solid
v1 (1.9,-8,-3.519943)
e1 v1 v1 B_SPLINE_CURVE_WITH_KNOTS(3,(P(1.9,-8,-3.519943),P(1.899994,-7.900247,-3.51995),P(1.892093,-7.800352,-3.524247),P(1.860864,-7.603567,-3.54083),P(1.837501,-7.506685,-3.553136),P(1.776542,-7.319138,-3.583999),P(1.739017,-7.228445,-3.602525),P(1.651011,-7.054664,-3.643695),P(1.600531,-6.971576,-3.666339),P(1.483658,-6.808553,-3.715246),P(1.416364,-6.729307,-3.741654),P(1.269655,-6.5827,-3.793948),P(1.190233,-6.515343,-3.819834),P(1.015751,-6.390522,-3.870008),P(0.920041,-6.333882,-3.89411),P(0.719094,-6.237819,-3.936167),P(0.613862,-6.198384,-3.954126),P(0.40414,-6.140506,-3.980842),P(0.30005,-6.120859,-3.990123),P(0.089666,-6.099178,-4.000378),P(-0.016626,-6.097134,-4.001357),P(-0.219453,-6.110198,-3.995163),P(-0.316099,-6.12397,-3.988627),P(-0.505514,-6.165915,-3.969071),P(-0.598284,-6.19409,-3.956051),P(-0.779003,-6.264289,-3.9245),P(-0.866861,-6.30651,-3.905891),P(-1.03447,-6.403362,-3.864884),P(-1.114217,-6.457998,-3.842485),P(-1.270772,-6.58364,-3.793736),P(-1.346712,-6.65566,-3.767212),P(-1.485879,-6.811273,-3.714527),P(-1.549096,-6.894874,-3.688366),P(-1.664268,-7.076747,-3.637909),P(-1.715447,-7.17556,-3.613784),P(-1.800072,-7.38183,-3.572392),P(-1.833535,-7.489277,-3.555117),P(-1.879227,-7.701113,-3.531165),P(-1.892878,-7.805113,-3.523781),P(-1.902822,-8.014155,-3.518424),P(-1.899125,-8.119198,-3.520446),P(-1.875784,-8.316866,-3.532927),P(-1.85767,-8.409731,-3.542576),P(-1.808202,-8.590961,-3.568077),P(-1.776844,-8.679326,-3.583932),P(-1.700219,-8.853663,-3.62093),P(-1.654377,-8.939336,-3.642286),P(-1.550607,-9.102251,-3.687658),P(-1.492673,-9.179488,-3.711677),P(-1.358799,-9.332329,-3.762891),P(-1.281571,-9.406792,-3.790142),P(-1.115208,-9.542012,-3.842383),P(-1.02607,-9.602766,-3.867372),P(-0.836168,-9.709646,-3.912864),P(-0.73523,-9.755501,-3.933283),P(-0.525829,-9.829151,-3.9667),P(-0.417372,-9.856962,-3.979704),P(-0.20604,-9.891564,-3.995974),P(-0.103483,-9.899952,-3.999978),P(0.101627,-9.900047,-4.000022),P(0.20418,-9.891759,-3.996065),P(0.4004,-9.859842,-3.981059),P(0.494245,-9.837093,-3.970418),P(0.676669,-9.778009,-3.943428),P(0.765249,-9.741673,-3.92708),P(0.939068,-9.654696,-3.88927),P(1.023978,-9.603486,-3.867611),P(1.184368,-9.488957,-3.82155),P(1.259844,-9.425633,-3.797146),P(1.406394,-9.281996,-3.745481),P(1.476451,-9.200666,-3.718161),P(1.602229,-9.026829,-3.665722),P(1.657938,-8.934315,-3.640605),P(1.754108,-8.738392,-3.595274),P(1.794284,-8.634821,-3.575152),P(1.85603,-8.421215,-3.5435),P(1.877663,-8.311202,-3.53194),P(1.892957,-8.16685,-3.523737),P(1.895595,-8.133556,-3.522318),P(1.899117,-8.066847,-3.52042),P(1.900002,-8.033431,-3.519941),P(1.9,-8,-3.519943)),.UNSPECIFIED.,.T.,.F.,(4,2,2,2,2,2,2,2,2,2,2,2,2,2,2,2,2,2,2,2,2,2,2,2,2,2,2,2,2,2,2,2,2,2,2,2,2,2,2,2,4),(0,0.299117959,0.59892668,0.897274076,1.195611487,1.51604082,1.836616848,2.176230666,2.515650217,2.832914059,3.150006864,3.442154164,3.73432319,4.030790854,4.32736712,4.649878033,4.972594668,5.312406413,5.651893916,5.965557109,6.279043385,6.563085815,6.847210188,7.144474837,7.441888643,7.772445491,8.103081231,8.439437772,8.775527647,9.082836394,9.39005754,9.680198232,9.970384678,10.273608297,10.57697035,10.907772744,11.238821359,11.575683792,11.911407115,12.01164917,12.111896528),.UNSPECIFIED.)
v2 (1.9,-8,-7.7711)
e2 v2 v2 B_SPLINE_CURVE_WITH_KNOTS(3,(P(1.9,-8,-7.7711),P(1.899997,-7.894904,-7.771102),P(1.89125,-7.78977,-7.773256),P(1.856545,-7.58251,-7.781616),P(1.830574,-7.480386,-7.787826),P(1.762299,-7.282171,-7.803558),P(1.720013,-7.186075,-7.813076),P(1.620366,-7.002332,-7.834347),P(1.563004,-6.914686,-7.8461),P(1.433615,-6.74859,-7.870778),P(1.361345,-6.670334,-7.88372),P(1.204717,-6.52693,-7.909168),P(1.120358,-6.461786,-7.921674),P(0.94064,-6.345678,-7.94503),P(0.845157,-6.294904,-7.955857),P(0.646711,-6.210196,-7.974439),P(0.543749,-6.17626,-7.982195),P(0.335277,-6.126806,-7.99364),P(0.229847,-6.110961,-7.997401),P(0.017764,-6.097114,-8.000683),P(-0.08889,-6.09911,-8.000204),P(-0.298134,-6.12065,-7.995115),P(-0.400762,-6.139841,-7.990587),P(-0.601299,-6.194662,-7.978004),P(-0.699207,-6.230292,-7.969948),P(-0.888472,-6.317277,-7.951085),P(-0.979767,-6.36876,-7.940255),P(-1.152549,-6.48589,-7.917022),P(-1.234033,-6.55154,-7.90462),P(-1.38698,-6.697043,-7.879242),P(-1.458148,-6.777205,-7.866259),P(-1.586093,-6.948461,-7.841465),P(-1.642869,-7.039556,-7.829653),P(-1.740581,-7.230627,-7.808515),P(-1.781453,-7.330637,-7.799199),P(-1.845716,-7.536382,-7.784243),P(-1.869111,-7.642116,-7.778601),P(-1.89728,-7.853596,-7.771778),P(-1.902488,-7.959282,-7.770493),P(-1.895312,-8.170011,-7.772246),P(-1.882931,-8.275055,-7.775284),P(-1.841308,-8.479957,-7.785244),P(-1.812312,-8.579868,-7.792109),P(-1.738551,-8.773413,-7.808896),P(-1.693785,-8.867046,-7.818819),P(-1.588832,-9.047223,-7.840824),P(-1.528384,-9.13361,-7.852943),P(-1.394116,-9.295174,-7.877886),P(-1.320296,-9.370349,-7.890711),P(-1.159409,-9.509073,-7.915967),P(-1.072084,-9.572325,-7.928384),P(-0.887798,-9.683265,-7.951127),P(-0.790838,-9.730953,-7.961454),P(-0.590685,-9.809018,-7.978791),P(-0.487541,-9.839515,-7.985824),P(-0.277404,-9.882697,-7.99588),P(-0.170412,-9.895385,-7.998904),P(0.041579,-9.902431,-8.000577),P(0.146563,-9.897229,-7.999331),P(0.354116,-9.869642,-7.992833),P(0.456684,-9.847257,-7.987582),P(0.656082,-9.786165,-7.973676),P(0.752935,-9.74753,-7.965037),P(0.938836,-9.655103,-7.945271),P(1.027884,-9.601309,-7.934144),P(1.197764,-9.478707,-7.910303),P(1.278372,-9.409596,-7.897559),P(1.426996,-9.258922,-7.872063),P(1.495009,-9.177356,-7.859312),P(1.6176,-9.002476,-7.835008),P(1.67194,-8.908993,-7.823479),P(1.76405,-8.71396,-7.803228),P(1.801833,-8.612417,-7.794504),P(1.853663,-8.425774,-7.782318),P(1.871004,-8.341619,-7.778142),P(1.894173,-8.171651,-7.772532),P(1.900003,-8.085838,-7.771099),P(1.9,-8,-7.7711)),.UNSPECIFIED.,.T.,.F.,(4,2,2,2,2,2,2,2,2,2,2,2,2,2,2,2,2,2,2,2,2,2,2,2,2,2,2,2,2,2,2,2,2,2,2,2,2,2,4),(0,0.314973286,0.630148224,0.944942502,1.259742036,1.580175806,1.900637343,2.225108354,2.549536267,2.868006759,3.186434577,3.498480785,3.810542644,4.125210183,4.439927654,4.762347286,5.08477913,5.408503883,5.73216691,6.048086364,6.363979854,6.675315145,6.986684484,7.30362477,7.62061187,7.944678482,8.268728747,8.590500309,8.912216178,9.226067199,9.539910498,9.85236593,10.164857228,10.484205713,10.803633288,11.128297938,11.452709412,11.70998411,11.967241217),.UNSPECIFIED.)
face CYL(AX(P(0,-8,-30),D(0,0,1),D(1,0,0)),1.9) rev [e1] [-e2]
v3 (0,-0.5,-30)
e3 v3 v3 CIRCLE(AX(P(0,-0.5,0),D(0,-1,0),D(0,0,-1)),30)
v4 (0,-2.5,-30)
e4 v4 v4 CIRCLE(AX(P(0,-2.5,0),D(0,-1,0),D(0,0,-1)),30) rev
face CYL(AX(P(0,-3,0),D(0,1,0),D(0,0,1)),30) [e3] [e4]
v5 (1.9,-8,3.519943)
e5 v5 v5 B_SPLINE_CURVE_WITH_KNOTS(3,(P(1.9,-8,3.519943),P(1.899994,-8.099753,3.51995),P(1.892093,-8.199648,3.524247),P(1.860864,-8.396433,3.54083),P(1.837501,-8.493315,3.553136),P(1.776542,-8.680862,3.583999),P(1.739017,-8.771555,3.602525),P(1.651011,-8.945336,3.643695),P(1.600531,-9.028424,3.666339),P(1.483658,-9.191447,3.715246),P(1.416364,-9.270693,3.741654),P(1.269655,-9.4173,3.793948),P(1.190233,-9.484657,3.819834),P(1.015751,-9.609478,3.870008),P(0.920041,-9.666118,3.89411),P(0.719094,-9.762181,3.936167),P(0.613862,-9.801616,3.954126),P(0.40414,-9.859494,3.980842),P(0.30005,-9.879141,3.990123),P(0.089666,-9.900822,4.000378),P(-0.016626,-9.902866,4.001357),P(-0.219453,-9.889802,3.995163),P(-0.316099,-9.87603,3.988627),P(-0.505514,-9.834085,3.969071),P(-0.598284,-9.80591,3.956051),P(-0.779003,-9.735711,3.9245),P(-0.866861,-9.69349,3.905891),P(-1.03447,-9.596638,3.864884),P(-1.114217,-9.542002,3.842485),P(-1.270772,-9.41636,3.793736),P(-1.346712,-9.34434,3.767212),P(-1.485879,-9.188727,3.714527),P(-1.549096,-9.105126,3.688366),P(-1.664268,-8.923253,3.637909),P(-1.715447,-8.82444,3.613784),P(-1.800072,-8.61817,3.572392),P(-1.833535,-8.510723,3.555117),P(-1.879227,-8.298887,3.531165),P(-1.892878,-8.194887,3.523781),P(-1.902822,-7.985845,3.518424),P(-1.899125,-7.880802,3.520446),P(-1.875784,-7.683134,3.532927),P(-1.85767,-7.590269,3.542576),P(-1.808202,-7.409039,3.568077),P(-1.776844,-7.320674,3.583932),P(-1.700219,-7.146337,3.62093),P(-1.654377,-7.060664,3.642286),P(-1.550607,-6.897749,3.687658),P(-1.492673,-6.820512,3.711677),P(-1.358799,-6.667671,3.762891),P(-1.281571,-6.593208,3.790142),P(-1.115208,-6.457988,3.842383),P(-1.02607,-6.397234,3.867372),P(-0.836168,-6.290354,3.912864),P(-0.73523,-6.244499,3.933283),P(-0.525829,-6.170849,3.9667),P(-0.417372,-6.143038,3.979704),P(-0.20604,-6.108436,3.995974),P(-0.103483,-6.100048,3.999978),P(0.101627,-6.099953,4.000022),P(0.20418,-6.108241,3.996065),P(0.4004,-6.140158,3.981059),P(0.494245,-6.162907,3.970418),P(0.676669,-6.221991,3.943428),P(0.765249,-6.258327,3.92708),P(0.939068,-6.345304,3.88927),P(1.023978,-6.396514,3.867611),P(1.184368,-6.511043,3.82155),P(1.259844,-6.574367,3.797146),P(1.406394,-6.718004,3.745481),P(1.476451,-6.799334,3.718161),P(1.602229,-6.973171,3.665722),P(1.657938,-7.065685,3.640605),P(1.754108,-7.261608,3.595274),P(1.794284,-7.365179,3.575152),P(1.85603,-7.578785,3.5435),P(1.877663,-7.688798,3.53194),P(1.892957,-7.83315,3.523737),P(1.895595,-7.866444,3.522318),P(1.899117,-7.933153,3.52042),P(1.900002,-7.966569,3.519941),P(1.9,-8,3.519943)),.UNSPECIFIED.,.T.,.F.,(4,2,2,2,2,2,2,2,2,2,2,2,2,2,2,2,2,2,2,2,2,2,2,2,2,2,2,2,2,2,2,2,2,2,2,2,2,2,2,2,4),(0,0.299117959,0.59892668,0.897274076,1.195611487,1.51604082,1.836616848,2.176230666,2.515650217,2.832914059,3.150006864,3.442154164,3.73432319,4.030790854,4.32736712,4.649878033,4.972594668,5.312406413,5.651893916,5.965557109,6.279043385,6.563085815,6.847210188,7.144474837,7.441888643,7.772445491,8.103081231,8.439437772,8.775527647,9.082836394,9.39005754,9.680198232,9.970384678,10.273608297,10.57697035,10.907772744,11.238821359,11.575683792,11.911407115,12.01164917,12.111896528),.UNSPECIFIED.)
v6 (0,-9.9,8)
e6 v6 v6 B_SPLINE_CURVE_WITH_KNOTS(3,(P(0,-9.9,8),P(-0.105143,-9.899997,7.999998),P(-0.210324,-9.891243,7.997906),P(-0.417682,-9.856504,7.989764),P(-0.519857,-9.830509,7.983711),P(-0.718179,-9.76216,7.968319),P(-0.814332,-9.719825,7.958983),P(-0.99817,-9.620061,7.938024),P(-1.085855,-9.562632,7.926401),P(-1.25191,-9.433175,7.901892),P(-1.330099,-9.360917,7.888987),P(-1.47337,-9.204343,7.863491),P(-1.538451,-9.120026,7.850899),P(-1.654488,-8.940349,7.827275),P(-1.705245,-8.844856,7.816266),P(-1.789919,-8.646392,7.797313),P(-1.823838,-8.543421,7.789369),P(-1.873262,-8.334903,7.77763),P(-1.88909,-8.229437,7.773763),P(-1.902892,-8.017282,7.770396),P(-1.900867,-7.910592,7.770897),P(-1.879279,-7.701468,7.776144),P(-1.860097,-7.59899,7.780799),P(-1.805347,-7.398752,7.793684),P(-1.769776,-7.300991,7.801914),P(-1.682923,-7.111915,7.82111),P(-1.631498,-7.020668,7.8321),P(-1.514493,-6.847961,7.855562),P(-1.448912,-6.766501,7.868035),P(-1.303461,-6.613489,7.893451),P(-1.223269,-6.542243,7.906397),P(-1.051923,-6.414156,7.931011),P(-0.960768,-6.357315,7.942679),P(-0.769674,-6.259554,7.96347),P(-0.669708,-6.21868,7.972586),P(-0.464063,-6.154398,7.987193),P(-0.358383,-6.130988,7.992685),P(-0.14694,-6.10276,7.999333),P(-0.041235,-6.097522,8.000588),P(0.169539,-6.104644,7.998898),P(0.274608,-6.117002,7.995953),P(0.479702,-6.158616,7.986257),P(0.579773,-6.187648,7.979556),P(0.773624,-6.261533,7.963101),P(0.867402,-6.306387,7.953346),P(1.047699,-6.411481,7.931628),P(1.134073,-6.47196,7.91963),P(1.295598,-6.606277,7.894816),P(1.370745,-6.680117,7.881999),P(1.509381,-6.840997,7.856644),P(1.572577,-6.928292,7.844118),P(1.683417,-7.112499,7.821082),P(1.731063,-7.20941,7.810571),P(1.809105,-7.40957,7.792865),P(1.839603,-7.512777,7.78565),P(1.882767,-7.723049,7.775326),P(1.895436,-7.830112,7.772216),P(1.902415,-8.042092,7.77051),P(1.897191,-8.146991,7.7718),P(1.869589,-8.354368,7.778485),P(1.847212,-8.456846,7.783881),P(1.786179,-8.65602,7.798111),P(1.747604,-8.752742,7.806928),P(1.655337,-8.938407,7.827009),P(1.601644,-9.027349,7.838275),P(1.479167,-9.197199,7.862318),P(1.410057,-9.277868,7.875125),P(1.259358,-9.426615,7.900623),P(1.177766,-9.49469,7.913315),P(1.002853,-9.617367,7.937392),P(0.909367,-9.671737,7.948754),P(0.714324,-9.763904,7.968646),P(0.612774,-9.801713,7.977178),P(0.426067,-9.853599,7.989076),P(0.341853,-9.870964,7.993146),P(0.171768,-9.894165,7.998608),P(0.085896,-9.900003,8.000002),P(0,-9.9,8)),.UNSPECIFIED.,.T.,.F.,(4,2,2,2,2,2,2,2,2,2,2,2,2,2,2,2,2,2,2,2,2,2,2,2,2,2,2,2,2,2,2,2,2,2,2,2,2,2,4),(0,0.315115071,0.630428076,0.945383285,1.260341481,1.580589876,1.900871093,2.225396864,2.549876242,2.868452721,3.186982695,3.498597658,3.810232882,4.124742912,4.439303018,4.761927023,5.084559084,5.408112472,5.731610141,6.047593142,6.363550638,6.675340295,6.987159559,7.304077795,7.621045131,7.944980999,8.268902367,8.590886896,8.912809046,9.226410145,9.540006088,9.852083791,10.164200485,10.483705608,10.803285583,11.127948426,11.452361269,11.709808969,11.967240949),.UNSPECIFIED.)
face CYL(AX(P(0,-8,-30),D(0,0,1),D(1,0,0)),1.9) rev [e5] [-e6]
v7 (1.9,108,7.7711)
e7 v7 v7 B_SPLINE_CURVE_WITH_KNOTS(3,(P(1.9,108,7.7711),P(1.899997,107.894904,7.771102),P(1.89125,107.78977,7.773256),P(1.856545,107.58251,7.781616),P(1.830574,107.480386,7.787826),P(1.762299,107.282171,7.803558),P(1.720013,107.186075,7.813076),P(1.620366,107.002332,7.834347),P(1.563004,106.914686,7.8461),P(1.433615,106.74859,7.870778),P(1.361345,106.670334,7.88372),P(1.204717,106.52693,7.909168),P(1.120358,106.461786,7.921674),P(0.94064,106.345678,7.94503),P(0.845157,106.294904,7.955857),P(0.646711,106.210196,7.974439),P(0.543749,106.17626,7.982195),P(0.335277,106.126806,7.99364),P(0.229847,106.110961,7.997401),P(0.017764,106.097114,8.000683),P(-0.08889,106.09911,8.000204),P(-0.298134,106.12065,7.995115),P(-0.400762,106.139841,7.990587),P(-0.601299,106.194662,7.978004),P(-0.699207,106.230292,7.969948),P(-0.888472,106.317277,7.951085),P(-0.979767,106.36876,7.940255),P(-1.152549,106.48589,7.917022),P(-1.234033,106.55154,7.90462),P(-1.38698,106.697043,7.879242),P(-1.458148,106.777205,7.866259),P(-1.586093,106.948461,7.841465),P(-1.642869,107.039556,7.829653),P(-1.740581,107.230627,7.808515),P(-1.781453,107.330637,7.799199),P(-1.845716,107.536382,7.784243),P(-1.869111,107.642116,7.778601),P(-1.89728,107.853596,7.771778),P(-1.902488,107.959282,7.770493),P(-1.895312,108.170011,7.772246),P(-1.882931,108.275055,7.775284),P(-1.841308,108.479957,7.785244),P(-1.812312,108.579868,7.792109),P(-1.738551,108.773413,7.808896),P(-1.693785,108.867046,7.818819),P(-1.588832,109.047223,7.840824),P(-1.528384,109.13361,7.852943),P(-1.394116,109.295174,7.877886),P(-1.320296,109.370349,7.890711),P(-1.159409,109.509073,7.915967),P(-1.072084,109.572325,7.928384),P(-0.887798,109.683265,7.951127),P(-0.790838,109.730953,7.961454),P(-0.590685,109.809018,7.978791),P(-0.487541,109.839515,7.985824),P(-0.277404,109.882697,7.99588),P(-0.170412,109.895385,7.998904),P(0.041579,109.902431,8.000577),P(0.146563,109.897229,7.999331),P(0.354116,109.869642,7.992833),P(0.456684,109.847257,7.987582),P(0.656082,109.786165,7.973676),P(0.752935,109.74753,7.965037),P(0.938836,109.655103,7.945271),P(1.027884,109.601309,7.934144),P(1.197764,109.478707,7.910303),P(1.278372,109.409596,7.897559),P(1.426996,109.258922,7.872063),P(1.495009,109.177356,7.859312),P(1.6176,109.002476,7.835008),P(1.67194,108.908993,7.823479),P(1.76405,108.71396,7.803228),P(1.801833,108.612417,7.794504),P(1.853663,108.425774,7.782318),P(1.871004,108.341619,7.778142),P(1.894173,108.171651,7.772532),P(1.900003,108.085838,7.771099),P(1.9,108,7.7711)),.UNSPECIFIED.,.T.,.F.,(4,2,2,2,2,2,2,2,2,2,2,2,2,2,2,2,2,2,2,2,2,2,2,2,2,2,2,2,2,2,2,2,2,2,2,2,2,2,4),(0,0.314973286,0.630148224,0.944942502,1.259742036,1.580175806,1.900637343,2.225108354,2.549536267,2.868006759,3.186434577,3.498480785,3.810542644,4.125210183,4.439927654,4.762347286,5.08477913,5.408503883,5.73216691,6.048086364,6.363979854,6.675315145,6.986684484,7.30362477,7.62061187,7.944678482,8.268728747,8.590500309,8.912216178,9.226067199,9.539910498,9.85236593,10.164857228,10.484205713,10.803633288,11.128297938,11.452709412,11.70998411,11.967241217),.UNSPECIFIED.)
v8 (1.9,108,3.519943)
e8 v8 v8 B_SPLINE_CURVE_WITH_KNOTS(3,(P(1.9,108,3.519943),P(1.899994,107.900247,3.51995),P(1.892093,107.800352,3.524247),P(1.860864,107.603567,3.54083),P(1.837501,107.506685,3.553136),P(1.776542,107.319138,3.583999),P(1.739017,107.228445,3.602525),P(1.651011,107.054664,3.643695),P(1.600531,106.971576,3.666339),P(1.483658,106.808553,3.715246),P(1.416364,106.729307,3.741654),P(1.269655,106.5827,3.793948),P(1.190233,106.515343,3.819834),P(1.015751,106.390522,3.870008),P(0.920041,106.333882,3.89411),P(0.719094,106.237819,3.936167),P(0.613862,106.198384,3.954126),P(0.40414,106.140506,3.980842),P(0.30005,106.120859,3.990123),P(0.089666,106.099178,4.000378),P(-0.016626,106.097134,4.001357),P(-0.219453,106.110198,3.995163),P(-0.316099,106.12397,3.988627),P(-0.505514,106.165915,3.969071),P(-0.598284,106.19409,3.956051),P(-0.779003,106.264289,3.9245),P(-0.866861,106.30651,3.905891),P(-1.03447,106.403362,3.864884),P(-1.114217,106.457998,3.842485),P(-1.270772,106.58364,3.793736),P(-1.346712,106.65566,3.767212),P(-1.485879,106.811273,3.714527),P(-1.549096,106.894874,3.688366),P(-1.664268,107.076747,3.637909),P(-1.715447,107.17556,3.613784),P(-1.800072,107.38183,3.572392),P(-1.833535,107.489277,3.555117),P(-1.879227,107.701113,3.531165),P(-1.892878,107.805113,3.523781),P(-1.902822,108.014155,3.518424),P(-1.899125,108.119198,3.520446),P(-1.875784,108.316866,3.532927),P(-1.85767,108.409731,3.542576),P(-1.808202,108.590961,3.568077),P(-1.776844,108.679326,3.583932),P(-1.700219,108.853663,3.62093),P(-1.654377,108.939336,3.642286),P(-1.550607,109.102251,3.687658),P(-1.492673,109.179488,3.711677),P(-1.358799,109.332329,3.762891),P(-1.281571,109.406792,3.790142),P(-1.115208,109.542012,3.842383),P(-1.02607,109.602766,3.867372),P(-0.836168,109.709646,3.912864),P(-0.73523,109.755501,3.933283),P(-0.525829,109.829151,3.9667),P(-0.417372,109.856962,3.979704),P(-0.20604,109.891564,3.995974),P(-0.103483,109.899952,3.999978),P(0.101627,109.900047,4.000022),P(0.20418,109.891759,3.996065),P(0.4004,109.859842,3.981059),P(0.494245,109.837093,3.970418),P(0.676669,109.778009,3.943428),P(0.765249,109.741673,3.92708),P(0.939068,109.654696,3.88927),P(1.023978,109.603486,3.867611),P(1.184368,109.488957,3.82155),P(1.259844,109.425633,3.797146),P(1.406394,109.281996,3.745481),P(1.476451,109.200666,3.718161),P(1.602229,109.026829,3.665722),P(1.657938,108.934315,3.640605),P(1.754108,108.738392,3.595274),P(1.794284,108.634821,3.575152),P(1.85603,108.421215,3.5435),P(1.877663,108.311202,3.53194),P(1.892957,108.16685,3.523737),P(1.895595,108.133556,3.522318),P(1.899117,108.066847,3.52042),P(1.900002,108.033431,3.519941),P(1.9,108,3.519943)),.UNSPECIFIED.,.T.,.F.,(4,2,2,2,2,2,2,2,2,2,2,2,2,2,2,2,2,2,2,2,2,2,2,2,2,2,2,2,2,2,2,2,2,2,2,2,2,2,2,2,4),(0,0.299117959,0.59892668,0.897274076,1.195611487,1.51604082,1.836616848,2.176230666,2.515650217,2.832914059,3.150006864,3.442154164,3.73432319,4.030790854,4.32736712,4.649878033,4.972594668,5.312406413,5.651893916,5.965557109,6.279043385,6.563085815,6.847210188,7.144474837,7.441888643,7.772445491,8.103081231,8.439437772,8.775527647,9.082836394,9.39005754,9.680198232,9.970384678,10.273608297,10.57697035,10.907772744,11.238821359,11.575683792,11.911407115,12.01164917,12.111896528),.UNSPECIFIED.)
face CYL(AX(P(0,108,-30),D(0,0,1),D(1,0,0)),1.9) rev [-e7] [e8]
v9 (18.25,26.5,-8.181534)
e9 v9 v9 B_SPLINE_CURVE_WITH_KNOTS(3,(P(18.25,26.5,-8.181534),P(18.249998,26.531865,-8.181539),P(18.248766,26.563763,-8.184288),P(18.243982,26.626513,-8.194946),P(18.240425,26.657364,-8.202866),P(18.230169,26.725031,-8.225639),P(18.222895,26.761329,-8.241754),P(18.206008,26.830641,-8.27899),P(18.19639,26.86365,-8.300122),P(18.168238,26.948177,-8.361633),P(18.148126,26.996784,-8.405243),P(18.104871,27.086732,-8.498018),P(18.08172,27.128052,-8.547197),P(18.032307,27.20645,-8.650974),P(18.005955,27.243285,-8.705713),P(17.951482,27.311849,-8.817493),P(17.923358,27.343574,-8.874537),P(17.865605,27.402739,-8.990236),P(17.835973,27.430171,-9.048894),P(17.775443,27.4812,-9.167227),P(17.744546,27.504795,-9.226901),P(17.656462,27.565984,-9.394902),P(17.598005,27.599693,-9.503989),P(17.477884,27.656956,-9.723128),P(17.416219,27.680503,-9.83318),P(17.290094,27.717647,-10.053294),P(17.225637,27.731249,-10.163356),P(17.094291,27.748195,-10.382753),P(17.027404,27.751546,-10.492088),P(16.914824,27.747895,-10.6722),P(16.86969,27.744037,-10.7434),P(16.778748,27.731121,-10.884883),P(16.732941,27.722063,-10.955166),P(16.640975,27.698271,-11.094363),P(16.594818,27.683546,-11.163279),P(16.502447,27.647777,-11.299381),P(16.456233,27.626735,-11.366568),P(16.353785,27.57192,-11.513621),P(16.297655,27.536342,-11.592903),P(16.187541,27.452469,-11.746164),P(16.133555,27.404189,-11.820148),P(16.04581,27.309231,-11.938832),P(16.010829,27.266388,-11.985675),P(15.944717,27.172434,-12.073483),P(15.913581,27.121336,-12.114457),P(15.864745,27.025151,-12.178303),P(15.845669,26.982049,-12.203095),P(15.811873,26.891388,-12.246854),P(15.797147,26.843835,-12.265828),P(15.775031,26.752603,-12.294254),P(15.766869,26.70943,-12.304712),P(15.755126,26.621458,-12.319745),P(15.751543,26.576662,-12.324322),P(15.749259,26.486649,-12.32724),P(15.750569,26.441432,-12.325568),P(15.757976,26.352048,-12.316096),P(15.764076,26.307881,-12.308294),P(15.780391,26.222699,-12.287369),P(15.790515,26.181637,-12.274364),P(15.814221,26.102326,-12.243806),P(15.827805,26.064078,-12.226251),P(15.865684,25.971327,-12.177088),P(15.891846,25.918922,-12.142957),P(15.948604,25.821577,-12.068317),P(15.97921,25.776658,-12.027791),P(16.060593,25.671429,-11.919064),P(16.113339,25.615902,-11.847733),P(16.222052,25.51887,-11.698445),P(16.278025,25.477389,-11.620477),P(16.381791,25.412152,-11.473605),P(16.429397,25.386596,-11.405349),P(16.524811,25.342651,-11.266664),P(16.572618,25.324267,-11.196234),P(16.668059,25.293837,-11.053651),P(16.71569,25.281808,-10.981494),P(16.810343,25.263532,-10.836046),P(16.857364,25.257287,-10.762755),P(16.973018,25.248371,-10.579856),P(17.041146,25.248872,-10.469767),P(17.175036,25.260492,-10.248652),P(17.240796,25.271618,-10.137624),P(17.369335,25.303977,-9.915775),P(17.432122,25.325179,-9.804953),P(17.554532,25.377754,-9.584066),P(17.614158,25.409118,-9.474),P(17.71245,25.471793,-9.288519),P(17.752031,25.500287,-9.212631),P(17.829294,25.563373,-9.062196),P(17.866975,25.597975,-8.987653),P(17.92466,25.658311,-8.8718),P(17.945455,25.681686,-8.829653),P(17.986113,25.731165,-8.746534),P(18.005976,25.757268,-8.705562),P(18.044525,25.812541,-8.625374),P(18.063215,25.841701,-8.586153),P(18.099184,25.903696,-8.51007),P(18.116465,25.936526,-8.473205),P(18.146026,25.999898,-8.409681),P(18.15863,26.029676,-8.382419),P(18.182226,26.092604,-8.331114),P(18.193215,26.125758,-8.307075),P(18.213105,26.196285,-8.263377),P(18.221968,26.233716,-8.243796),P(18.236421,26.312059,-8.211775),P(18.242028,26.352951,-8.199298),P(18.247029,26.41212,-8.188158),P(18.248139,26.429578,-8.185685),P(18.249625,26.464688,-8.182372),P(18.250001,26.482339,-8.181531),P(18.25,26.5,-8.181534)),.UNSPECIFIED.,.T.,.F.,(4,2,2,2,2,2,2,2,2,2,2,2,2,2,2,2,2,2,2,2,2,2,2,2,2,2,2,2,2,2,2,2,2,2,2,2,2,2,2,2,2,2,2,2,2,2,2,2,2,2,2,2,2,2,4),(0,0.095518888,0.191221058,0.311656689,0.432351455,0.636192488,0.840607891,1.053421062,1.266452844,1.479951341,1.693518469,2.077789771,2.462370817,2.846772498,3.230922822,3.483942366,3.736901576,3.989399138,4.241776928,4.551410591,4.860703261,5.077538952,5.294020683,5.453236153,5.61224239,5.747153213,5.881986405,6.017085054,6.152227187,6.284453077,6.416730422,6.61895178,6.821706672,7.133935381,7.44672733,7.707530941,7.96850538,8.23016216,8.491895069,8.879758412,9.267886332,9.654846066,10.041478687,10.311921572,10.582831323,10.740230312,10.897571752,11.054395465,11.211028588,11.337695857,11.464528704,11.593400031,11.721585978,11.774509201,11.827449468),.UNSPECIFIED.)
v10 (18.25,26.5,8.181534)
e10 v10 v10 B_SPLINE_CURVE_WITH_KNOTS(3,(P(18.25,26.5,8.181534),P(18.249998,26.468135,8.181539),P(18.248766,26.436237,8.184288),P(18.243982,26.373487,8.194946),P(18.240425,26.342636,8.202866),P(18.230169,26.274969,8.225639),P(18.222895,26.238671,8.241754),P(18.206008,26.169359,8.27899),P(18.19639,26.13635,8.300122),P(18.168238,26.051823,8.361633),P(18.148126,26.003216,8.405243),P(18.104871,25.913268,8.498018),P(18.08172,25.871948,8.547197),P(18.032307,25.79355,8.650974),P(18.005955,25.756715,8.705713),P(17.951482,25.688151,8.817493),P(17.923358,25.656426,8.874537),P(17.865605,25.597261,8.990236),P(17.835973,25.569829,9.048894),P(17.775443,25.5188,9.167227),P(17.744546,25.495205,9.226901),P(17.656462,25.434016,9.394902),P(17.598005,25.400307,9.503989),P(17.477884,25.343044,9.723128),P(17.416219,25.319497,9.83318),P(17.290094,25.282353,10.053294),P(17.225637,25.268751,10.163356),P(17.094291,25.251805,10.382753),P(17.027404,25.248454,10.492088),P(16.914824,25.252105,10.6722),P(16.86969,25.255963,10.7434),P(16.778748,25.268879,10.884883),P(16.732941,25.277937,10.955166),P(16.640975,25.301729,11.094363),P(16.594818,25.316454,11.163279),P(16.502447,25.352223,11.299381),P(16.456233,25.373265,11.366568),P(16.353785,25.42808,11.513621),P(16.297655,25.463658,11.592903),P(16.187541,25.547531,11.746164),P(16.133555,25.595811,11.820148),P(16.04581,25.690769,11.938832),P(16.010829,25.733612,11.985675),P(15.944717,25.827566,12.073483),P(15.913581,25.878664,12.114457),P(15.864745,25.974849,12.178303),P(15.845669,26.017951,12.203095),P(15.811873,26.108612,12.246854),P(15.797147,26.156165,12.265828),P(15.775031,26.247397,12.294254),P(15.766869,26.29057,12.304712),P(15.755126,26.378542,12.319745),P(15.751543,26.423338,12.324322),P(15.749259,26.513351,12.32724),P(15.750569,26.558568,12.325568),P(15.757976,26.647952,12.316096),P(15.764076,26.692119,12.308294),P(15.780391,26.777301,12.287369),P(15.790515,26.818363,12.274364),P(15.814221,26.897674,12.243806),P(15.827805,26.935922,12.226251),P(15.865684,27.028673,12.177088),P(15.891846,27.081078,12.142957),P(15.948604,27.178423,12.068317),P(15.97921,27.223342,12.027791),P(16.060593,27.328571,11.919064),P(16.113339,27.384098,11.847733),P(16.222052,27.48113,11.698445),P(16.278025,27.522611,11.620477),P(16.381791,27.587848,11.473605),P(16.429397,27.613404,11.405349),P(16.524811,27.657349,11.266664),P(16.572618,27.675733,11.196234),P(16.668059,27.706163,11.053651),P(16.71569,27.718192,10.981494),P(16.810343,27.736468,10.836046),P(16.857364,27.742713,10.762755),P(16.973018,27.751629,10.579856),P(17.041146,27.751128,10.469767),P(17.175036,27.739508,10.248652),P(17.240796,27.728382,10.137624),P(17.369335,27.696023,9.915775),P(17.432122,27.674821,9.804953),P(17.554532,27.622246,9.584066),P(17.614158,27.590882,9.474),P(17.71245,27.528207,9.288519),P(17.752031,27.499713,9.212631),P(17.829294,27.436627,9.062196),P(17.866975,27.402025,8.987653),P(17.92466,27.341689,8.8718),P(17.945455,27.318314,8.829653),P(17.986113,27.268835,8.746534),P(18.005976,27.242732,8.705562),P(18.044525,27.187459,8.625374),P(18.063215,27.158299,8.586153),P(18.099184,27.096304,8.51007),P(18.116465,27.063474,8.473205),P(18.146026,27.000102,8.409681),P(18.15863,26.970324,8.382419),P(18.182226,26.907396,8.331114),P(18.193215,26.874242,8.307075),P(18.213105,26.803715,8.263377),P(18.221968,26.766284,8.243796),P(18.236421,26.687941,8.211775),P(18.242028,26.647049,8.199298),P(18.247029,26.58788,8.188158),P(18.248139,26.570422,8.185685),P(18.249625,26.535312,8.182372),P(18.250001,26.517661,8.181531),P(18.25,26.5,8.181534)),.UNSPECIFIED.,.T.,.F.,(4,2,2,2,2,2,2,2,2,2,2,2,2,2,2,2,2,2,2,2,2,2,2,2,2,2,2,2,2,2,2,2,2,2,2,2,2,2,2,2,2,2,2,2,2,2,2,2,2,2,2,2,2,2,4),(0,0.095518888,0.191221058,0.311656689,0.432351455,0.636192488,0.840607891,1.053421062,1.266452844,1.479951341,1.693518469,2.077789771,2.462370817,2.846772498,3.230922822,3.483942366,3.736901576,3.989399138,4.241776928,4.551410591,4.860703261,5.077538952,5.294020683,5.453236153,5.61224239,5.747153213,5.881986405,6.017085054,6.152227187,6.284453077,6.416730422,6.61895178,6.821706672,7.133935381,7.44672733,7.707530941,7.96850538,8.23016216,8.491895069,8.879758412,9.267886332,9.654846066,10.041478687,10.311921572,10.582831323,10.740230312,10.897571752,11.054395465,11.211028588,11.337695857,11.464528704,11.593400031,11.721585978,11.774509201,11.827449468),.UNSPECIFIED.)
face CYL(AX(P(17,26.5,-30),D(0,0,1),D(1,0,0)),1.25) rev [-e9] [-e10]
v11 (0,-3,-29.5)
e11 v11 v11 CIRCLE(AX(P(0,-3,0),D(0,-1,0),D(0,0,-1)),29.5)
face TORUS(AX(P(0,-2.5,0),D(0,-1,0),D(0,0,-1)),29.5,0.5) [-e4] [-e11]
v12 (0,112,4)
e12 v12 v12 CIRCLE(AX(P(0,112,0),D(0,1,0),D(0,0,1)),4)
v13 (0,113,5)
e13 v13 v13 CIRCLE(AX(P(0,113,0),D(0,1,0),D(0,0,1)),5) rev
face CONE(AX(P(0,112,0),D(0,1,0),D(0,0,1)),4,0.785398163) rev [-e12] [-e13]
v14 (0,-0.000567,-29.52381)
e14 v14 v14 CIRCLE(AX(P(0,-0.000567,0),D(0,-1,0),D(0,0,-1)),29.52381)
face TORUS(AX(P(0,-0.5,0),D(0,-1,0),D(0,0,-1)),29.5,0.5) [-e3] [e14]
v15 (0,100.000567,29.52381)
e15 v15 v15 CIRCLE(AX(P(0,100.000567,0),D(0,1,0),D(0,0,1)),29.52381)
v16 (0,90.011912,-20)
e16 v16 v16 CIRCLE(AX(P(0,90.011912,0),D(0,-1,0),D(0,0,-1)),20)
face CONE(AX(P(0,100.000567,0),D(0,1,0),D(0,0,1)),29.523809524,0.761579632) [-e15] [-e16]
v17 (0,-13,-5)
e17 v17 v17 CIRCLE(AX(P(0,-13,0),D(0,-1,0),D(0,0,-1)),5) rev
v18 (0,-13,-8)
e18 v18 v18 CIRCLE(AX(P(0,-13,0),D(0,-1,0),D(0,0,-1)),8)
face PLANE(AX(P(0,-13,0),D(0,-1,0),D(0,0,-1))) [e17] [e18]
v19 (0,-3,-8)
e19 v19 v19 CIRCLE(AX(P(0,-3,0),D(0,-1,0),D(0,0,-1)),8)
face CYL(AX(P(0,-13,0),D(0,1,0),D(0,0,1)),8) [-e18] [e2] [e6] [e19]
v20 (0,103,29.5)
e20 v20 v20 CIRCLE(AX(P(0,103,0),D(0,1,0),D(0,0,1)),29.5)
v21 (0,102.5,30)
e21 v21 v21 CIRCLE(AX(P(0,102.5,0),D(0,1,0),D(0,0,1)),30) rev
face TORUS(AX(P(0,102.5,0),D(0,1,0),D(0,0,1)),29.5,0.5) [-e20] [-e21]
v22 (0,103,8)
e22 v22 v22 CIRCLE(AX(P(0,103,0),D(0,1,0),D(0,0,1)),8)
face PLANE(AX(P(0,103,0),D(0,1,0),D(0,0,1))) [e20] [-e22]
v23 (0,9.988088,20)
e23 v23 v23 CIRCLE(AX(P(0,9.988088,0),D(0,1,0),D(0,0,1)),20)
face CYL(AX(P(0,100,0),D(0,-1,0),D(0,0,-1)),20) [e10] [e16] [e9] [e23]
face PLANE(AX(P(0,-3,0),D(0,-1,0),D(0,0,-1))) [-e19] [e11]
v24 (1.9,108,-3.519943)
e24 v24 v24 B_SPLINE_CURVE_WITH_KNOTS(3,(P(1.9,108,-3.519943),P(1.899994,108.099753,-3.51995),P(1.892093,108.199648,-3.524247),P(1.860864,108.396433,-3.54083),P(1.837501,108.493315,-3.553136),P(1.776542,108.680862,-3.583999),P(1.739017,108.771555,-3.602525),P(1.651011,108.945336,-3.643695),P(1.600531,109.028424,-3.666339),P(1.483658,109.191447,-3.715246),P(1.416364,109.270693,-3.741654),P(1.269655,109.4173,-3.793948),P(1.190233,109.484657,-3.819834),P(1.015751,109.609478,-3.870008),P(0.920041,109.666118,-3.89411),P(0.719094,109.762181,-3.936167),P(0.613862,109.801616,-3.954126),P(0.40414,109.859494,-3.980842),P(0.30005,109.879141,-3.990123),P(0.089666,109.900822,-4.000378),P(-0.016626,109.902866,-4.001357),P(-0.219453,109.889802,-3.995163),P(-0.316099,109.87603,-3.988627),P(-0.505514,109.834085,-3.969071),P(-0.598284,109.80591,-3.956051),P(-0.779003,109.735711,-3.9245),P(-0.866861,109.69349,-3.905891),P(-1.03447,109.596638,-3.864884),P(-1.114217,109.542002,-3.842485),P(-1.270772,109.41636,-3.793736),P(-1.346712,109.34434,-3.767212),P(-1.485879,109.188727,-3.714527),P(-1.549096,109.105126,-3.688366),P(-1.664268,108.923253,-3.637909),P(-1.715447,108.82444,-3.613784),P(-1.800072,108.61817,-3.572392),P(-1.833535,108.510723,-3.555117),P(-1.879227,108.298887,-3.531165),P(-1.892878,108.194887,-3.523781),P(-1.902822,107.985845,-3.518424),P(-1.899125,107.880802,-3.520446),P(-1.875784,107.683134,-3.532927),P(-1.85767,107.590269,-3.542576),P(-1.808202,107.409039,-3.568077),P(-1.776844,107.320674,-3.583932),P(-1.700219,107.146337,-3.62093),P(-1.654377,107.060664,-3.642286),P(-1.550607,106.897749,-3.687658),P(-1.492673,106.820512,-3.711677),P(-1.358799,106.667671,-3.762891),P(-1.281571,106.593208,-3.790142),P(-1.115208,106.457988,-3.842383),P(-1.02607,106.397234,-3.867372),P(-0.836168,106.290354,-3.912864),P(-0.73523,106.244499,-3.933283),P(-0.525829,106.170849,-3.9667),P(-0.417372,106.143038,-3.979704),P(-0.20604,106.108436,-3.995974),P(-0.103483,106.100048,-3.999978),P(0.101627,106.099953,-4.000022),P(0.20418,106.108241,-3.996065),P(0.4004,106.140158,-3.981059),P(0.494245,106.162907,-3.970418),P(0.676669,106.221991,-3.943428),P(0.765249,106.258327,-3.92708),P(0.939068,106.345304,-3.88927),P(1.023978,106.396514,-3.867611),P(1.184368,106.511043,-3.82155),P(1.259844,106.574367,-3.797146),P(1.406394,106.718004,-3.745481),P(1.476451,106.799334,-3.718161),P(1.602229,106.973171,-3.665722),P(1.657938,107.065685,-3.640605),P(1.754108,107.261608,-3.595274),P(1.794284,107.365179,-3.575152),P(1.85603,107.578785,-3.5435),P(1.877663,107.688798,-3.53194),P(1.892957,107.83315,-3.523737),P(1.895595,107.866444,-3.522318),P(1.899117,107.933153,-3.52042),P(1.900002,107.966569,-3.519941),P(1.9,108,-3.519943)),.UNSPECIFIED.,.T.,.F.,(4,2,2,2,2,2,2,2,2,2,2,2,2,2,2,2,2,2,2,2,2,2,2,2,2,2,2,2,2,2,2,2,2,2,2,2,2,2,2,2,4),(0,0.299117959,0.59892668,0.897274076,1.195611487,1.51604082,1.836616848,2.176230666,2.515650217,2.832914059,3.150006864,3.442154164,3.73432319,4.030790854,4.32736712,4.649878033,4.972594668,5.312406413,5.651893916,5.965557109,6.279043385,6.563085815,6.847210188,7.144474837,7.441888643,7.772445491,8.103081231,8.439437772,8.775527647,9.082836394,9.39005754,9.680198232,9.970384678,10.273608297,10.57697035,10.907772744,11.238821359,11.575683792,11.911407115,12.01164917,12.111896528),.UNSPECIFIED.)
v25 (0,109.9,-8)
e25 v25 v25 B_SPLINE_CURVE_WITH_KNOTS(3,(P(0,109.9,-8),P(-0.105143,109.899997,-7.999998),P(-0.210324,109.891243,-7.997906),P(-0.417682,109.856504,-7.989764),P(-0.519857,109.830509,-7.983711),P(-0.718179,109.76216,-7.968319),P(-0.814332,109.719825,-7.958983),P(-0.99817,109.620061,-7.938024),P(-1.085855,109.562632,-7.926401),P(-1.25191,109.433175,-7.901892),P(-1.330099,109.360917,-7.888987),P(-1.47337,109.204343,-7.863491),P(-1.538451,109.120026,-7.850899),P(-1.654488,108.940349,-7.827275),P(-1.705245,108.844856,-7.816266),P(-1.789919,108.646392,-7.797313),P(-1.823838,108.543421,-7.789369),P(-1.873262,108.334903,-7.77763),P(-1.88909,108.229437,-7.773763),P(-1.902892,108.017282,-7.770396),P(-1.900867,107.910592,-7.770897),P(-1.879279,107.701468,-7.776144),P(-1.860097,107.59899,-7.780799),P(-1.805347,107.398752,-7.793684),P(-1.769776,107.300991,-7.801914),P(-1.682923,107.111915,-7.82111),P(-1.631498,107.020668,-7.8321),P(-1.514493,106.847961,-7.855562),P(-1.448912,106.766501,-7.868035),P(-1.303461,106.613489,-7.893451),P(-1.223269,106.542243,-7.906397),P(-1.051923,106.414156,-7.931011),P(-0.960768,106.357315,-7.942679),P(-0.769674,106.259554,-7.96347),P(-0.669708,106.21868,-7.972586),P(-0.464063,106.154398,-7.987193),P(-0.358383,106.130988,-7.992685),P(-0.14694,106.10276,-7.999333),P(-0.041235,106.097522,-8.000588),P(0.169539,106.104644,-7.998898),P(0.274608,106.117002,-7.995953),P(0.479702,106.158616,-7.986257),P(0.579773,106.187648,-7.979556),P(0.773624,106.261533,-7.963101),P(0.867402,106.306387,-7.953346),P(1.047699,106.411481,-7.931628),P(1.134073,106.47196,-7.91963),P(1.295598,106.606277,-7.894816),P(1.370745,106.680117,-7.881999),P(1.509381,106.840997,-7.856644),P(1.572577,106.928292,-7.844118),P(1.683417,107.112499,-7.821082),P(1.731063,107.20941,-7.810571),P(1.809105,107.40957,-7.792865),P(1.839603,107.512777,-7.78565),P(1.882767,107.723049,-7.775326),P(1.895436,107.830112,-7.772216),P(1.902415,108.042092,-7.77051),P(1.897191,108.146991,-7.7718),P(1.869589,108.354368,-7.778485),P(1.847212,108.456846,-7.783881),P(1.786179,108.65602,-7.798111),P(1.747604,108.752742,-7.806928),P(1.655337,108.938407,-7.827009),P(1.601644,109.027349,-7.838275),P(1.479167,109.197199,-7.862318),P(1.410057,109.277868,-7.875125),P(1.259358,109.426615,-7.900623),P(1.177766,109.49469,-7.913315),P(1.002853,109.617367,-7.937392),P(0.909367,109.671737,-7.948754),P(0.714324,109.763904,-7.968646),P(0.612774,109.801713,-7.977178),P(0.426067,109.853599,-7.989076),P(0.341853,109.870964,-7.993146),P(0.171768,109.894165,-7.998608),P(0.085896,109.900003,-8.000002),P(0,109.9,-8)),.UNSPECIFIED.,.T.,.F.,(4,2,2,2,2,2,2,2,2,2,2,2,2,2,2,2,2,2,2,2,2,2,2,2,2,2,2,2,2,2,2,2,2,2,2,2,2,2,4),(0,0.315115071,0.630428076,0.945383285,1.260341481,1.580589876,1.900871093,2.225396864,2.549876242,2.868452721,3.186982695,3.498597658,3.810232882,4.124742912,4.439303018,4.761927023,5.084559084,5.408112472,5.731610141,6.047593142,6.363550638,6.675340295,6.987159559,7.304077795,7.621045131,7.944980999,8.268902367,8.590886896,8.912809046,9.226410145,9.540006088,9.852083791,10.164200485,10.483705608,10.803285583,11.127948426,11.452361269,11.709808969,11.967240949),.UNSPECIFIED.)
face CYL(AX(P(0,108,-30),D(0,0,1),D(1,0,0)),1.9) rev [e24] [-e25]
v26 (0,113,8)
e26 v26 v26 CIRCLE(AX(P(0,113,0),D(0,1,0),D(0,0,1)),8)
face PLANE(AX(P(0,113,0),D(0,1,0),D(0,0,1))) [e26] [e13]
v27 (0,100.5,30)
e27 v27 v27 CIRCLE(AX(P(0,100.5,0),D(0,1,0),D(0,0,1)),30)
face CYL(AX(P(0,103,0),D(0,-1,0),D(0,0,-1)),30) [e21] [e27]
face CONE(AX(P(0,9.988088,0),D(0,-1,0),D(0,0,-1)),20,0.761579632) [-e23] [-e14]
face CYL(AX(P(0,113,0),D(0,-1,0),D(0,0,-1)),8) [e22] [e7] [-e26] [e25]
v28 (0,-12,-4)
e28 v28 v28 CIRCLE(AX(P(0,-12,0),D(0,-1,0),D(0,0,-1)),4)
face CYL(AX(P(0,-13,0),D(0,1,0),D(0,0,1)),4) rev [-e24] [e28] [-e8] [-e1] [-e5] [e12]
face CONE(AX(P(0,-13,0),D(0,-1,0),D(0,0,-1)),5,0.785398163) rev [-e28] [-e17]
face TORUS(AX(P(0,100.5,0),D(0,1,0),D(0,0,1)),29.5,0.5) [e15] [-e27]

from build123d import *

# Parameters (mm, degrees)
SKETCH_1_R               = 20
EXTRUDE_1_DEPTH          = 100
SKETCH_2_R               = 30
EXTRUDE_2_DEPTH          = 3
EXTRUDE_START            = 3
SKETCH_3_R               = 30
EXTRUDE_3_DEPTH          = 3
CUT_EXTRUDE_1_DEPTH      = 112.39569112
CUT_EXTRUDE_1_DEPTH_BACK = 112.39569112
SKETCH_4_R               = 1.25
SKETCH_6_R               = 8
EXTRUDE_4_DEPTH          = 10
EXTRUDE_START_2          = 10
SKETCH_5_R               = 8
EXTRUDE_5_DEPTH          = 10
CUT_EXTRUDE_2_DEPTH      = 121.702112658
CUT_EXTRUDE_2_DEPTH_BACK = 121.702112658
SKETCH_7_R               = 1.9
SKETCH_8_R               = 4
CUT_EXTRUDE_3_DEPTH      = 133.951118932
CHAMFER_1_SIZE           = 1
FILLET_1_R               = 0.5


with BuildPart() as part:
    # 草图1 → 凸台-拉伸1 (new body)
    with BuildSketch(Plane(origin=(0, 0, 0), x_dir=(1, 0, 0), z_dir=(0, 1, 0))):
        with Locations(Location((0, 0, 0), (0, 0, 270))):
            Circle(SKETCH_1_R)
    extrude(amount=EXTRUDE_1_DEPTH)

    # 草图2 → 凸台-拉伸2 (add)
    with BuildSketch(Plane(origin=(0, 100, 0), x_dir=(1, 0, 0), z_dir=(0, 1, 0))):
        with Locations(Location((0, 0, 0), (0, 0, 270))):
            Circle(SKETCH_2_R)
    extrude(amount=EXTRUDE_2_DEPTH)

    # 草图3 → 凸台-拉伸3 (add)
    with BuildSketch(Plane.XZ.offset(EXTRUDE_START)):
        with Locations(Location((0, 0, 0), (0, 0, 90))):
            Circle(SKETCH_3_R)
    extrude(amount=-EXTRUDE_3_DEPTH)

    # 草图4 → 切除-拉伸1 (cut, two sides: drawn at the far end of the back side and taken through both)
    with BuildSketch(Plane.XY.offset(-CUT_EXTRUDE_1_DEPTH_BACK)):
        with Locations((17, 26.5)):
            Circle(SKETCH_4_R)
    extrude(amount=CUT_EXTRUDE_1_DEPTH + CUT_EXTRUDE_1_DEPTH_BACK, mode=Mode.SUBTRACT)

    # 草图6 → 凸台-拉伸4 (add)
    with BuildSketch(Plane.XZ.offset(3)):
        with Locations(Location((0, 0, 0), (0, 0, 270))):
            Circle(SKETCH_6_R)
    extrude(amount=EXTRUDE_4_DEPTH)

    # 草图5 → 凸台-拉伸5 (add)
    with BuildSketch(Plane(origin=(0, 103, 0), x_dir=(1, 0, 0), z_dir=(0, 1, 0)).offset(EXTRUDE_START_2)):
        with Locations(Location((0, 0, 0), (0, 0, 90))):
            Circle(SKETCH_5_R)
    extrude(amount=-EXTRUDE_5_DEPTH)

    # 草图7 → 切除-拉伸2 (cut, two sides: drawn at the far end of the back side and taken through both)
    with BuildSketch(Plane.XY.offset(-CUT_EXTRUDE_2_DEPTH_BACK)):
        with Locations(Location((0, 108, 0), (0, 0, 90.000000026))):
            Circle(SKETCH_7_R)
        with Locations(Location((0, -8, 0), (0, 0, 269.999999974))):
            Circle(SKETCH_7_R)
    extrude(amount=CUT_EXTRUDE_2_DEPTH + CUT_EXTRUDE_2_DEPTH_BACK, mode=Mode.SUBTRACT)

    # 草图8 → 切除-拉伸3 (cut, through all)
    with BuildSketch(Plane(origin=(0, 113, 0), x_dir=(1, 0, 0), z_dir=(0, 1, 0))):
        with Locations(Location((0, 0, 0), (0, 0, 270))):
            Circle(SKETCH_8_R)
    extrude(amount=-CUT_EXTRUDE_3_DEPTH, mode=Mode.SUBTRACT)

    # 倒角1
    chamfer_1_edges = [part.edges().sort_by_distance(p)[0] for p in [
        (0, -13, -4),
        (0, 113, -4),
    ]]
    chamfer(chamfer_1_edges, length=CHAMFER_1_SIZE)

    # 圆角1
    fillet_1_edges = [part.edges().sort_by_distance(p)[0] for p in [
        (0, 0, -30),
        (0, -3, -30),
        (0, 100, -30),
        (0, 103, -30),
    ]]
    fillet(fillet_1_edges, radius=FILLET_1_R)

    # 倒角2: read off the stored shape, not the designer's step
    # 倒角2 outline → 倒角2 (revolve)
    with BuildSketch(Plane.XY):
        Polygon((20, 100), (20, 90.011911518), (29.523809524, 100.000567215), (29.5, 100.000567215), align=None)
    revolve(axis=Axis((0, 0, 0), (0, 1, 0)))

    # 倒角3: read off the stored shape, not the designer's step
    # 倒角3 outline → 倒角3 (revolve)
    with BuildSketch(Plane.XY):
        Polygon((20, 9.988088482), (20, 0), (29.5, 0), (29.523809524, -0.000567215), align=None)
    revolve(axis=Axis((0, 0, 0), (0, 1, 0)))


solid = part.part
